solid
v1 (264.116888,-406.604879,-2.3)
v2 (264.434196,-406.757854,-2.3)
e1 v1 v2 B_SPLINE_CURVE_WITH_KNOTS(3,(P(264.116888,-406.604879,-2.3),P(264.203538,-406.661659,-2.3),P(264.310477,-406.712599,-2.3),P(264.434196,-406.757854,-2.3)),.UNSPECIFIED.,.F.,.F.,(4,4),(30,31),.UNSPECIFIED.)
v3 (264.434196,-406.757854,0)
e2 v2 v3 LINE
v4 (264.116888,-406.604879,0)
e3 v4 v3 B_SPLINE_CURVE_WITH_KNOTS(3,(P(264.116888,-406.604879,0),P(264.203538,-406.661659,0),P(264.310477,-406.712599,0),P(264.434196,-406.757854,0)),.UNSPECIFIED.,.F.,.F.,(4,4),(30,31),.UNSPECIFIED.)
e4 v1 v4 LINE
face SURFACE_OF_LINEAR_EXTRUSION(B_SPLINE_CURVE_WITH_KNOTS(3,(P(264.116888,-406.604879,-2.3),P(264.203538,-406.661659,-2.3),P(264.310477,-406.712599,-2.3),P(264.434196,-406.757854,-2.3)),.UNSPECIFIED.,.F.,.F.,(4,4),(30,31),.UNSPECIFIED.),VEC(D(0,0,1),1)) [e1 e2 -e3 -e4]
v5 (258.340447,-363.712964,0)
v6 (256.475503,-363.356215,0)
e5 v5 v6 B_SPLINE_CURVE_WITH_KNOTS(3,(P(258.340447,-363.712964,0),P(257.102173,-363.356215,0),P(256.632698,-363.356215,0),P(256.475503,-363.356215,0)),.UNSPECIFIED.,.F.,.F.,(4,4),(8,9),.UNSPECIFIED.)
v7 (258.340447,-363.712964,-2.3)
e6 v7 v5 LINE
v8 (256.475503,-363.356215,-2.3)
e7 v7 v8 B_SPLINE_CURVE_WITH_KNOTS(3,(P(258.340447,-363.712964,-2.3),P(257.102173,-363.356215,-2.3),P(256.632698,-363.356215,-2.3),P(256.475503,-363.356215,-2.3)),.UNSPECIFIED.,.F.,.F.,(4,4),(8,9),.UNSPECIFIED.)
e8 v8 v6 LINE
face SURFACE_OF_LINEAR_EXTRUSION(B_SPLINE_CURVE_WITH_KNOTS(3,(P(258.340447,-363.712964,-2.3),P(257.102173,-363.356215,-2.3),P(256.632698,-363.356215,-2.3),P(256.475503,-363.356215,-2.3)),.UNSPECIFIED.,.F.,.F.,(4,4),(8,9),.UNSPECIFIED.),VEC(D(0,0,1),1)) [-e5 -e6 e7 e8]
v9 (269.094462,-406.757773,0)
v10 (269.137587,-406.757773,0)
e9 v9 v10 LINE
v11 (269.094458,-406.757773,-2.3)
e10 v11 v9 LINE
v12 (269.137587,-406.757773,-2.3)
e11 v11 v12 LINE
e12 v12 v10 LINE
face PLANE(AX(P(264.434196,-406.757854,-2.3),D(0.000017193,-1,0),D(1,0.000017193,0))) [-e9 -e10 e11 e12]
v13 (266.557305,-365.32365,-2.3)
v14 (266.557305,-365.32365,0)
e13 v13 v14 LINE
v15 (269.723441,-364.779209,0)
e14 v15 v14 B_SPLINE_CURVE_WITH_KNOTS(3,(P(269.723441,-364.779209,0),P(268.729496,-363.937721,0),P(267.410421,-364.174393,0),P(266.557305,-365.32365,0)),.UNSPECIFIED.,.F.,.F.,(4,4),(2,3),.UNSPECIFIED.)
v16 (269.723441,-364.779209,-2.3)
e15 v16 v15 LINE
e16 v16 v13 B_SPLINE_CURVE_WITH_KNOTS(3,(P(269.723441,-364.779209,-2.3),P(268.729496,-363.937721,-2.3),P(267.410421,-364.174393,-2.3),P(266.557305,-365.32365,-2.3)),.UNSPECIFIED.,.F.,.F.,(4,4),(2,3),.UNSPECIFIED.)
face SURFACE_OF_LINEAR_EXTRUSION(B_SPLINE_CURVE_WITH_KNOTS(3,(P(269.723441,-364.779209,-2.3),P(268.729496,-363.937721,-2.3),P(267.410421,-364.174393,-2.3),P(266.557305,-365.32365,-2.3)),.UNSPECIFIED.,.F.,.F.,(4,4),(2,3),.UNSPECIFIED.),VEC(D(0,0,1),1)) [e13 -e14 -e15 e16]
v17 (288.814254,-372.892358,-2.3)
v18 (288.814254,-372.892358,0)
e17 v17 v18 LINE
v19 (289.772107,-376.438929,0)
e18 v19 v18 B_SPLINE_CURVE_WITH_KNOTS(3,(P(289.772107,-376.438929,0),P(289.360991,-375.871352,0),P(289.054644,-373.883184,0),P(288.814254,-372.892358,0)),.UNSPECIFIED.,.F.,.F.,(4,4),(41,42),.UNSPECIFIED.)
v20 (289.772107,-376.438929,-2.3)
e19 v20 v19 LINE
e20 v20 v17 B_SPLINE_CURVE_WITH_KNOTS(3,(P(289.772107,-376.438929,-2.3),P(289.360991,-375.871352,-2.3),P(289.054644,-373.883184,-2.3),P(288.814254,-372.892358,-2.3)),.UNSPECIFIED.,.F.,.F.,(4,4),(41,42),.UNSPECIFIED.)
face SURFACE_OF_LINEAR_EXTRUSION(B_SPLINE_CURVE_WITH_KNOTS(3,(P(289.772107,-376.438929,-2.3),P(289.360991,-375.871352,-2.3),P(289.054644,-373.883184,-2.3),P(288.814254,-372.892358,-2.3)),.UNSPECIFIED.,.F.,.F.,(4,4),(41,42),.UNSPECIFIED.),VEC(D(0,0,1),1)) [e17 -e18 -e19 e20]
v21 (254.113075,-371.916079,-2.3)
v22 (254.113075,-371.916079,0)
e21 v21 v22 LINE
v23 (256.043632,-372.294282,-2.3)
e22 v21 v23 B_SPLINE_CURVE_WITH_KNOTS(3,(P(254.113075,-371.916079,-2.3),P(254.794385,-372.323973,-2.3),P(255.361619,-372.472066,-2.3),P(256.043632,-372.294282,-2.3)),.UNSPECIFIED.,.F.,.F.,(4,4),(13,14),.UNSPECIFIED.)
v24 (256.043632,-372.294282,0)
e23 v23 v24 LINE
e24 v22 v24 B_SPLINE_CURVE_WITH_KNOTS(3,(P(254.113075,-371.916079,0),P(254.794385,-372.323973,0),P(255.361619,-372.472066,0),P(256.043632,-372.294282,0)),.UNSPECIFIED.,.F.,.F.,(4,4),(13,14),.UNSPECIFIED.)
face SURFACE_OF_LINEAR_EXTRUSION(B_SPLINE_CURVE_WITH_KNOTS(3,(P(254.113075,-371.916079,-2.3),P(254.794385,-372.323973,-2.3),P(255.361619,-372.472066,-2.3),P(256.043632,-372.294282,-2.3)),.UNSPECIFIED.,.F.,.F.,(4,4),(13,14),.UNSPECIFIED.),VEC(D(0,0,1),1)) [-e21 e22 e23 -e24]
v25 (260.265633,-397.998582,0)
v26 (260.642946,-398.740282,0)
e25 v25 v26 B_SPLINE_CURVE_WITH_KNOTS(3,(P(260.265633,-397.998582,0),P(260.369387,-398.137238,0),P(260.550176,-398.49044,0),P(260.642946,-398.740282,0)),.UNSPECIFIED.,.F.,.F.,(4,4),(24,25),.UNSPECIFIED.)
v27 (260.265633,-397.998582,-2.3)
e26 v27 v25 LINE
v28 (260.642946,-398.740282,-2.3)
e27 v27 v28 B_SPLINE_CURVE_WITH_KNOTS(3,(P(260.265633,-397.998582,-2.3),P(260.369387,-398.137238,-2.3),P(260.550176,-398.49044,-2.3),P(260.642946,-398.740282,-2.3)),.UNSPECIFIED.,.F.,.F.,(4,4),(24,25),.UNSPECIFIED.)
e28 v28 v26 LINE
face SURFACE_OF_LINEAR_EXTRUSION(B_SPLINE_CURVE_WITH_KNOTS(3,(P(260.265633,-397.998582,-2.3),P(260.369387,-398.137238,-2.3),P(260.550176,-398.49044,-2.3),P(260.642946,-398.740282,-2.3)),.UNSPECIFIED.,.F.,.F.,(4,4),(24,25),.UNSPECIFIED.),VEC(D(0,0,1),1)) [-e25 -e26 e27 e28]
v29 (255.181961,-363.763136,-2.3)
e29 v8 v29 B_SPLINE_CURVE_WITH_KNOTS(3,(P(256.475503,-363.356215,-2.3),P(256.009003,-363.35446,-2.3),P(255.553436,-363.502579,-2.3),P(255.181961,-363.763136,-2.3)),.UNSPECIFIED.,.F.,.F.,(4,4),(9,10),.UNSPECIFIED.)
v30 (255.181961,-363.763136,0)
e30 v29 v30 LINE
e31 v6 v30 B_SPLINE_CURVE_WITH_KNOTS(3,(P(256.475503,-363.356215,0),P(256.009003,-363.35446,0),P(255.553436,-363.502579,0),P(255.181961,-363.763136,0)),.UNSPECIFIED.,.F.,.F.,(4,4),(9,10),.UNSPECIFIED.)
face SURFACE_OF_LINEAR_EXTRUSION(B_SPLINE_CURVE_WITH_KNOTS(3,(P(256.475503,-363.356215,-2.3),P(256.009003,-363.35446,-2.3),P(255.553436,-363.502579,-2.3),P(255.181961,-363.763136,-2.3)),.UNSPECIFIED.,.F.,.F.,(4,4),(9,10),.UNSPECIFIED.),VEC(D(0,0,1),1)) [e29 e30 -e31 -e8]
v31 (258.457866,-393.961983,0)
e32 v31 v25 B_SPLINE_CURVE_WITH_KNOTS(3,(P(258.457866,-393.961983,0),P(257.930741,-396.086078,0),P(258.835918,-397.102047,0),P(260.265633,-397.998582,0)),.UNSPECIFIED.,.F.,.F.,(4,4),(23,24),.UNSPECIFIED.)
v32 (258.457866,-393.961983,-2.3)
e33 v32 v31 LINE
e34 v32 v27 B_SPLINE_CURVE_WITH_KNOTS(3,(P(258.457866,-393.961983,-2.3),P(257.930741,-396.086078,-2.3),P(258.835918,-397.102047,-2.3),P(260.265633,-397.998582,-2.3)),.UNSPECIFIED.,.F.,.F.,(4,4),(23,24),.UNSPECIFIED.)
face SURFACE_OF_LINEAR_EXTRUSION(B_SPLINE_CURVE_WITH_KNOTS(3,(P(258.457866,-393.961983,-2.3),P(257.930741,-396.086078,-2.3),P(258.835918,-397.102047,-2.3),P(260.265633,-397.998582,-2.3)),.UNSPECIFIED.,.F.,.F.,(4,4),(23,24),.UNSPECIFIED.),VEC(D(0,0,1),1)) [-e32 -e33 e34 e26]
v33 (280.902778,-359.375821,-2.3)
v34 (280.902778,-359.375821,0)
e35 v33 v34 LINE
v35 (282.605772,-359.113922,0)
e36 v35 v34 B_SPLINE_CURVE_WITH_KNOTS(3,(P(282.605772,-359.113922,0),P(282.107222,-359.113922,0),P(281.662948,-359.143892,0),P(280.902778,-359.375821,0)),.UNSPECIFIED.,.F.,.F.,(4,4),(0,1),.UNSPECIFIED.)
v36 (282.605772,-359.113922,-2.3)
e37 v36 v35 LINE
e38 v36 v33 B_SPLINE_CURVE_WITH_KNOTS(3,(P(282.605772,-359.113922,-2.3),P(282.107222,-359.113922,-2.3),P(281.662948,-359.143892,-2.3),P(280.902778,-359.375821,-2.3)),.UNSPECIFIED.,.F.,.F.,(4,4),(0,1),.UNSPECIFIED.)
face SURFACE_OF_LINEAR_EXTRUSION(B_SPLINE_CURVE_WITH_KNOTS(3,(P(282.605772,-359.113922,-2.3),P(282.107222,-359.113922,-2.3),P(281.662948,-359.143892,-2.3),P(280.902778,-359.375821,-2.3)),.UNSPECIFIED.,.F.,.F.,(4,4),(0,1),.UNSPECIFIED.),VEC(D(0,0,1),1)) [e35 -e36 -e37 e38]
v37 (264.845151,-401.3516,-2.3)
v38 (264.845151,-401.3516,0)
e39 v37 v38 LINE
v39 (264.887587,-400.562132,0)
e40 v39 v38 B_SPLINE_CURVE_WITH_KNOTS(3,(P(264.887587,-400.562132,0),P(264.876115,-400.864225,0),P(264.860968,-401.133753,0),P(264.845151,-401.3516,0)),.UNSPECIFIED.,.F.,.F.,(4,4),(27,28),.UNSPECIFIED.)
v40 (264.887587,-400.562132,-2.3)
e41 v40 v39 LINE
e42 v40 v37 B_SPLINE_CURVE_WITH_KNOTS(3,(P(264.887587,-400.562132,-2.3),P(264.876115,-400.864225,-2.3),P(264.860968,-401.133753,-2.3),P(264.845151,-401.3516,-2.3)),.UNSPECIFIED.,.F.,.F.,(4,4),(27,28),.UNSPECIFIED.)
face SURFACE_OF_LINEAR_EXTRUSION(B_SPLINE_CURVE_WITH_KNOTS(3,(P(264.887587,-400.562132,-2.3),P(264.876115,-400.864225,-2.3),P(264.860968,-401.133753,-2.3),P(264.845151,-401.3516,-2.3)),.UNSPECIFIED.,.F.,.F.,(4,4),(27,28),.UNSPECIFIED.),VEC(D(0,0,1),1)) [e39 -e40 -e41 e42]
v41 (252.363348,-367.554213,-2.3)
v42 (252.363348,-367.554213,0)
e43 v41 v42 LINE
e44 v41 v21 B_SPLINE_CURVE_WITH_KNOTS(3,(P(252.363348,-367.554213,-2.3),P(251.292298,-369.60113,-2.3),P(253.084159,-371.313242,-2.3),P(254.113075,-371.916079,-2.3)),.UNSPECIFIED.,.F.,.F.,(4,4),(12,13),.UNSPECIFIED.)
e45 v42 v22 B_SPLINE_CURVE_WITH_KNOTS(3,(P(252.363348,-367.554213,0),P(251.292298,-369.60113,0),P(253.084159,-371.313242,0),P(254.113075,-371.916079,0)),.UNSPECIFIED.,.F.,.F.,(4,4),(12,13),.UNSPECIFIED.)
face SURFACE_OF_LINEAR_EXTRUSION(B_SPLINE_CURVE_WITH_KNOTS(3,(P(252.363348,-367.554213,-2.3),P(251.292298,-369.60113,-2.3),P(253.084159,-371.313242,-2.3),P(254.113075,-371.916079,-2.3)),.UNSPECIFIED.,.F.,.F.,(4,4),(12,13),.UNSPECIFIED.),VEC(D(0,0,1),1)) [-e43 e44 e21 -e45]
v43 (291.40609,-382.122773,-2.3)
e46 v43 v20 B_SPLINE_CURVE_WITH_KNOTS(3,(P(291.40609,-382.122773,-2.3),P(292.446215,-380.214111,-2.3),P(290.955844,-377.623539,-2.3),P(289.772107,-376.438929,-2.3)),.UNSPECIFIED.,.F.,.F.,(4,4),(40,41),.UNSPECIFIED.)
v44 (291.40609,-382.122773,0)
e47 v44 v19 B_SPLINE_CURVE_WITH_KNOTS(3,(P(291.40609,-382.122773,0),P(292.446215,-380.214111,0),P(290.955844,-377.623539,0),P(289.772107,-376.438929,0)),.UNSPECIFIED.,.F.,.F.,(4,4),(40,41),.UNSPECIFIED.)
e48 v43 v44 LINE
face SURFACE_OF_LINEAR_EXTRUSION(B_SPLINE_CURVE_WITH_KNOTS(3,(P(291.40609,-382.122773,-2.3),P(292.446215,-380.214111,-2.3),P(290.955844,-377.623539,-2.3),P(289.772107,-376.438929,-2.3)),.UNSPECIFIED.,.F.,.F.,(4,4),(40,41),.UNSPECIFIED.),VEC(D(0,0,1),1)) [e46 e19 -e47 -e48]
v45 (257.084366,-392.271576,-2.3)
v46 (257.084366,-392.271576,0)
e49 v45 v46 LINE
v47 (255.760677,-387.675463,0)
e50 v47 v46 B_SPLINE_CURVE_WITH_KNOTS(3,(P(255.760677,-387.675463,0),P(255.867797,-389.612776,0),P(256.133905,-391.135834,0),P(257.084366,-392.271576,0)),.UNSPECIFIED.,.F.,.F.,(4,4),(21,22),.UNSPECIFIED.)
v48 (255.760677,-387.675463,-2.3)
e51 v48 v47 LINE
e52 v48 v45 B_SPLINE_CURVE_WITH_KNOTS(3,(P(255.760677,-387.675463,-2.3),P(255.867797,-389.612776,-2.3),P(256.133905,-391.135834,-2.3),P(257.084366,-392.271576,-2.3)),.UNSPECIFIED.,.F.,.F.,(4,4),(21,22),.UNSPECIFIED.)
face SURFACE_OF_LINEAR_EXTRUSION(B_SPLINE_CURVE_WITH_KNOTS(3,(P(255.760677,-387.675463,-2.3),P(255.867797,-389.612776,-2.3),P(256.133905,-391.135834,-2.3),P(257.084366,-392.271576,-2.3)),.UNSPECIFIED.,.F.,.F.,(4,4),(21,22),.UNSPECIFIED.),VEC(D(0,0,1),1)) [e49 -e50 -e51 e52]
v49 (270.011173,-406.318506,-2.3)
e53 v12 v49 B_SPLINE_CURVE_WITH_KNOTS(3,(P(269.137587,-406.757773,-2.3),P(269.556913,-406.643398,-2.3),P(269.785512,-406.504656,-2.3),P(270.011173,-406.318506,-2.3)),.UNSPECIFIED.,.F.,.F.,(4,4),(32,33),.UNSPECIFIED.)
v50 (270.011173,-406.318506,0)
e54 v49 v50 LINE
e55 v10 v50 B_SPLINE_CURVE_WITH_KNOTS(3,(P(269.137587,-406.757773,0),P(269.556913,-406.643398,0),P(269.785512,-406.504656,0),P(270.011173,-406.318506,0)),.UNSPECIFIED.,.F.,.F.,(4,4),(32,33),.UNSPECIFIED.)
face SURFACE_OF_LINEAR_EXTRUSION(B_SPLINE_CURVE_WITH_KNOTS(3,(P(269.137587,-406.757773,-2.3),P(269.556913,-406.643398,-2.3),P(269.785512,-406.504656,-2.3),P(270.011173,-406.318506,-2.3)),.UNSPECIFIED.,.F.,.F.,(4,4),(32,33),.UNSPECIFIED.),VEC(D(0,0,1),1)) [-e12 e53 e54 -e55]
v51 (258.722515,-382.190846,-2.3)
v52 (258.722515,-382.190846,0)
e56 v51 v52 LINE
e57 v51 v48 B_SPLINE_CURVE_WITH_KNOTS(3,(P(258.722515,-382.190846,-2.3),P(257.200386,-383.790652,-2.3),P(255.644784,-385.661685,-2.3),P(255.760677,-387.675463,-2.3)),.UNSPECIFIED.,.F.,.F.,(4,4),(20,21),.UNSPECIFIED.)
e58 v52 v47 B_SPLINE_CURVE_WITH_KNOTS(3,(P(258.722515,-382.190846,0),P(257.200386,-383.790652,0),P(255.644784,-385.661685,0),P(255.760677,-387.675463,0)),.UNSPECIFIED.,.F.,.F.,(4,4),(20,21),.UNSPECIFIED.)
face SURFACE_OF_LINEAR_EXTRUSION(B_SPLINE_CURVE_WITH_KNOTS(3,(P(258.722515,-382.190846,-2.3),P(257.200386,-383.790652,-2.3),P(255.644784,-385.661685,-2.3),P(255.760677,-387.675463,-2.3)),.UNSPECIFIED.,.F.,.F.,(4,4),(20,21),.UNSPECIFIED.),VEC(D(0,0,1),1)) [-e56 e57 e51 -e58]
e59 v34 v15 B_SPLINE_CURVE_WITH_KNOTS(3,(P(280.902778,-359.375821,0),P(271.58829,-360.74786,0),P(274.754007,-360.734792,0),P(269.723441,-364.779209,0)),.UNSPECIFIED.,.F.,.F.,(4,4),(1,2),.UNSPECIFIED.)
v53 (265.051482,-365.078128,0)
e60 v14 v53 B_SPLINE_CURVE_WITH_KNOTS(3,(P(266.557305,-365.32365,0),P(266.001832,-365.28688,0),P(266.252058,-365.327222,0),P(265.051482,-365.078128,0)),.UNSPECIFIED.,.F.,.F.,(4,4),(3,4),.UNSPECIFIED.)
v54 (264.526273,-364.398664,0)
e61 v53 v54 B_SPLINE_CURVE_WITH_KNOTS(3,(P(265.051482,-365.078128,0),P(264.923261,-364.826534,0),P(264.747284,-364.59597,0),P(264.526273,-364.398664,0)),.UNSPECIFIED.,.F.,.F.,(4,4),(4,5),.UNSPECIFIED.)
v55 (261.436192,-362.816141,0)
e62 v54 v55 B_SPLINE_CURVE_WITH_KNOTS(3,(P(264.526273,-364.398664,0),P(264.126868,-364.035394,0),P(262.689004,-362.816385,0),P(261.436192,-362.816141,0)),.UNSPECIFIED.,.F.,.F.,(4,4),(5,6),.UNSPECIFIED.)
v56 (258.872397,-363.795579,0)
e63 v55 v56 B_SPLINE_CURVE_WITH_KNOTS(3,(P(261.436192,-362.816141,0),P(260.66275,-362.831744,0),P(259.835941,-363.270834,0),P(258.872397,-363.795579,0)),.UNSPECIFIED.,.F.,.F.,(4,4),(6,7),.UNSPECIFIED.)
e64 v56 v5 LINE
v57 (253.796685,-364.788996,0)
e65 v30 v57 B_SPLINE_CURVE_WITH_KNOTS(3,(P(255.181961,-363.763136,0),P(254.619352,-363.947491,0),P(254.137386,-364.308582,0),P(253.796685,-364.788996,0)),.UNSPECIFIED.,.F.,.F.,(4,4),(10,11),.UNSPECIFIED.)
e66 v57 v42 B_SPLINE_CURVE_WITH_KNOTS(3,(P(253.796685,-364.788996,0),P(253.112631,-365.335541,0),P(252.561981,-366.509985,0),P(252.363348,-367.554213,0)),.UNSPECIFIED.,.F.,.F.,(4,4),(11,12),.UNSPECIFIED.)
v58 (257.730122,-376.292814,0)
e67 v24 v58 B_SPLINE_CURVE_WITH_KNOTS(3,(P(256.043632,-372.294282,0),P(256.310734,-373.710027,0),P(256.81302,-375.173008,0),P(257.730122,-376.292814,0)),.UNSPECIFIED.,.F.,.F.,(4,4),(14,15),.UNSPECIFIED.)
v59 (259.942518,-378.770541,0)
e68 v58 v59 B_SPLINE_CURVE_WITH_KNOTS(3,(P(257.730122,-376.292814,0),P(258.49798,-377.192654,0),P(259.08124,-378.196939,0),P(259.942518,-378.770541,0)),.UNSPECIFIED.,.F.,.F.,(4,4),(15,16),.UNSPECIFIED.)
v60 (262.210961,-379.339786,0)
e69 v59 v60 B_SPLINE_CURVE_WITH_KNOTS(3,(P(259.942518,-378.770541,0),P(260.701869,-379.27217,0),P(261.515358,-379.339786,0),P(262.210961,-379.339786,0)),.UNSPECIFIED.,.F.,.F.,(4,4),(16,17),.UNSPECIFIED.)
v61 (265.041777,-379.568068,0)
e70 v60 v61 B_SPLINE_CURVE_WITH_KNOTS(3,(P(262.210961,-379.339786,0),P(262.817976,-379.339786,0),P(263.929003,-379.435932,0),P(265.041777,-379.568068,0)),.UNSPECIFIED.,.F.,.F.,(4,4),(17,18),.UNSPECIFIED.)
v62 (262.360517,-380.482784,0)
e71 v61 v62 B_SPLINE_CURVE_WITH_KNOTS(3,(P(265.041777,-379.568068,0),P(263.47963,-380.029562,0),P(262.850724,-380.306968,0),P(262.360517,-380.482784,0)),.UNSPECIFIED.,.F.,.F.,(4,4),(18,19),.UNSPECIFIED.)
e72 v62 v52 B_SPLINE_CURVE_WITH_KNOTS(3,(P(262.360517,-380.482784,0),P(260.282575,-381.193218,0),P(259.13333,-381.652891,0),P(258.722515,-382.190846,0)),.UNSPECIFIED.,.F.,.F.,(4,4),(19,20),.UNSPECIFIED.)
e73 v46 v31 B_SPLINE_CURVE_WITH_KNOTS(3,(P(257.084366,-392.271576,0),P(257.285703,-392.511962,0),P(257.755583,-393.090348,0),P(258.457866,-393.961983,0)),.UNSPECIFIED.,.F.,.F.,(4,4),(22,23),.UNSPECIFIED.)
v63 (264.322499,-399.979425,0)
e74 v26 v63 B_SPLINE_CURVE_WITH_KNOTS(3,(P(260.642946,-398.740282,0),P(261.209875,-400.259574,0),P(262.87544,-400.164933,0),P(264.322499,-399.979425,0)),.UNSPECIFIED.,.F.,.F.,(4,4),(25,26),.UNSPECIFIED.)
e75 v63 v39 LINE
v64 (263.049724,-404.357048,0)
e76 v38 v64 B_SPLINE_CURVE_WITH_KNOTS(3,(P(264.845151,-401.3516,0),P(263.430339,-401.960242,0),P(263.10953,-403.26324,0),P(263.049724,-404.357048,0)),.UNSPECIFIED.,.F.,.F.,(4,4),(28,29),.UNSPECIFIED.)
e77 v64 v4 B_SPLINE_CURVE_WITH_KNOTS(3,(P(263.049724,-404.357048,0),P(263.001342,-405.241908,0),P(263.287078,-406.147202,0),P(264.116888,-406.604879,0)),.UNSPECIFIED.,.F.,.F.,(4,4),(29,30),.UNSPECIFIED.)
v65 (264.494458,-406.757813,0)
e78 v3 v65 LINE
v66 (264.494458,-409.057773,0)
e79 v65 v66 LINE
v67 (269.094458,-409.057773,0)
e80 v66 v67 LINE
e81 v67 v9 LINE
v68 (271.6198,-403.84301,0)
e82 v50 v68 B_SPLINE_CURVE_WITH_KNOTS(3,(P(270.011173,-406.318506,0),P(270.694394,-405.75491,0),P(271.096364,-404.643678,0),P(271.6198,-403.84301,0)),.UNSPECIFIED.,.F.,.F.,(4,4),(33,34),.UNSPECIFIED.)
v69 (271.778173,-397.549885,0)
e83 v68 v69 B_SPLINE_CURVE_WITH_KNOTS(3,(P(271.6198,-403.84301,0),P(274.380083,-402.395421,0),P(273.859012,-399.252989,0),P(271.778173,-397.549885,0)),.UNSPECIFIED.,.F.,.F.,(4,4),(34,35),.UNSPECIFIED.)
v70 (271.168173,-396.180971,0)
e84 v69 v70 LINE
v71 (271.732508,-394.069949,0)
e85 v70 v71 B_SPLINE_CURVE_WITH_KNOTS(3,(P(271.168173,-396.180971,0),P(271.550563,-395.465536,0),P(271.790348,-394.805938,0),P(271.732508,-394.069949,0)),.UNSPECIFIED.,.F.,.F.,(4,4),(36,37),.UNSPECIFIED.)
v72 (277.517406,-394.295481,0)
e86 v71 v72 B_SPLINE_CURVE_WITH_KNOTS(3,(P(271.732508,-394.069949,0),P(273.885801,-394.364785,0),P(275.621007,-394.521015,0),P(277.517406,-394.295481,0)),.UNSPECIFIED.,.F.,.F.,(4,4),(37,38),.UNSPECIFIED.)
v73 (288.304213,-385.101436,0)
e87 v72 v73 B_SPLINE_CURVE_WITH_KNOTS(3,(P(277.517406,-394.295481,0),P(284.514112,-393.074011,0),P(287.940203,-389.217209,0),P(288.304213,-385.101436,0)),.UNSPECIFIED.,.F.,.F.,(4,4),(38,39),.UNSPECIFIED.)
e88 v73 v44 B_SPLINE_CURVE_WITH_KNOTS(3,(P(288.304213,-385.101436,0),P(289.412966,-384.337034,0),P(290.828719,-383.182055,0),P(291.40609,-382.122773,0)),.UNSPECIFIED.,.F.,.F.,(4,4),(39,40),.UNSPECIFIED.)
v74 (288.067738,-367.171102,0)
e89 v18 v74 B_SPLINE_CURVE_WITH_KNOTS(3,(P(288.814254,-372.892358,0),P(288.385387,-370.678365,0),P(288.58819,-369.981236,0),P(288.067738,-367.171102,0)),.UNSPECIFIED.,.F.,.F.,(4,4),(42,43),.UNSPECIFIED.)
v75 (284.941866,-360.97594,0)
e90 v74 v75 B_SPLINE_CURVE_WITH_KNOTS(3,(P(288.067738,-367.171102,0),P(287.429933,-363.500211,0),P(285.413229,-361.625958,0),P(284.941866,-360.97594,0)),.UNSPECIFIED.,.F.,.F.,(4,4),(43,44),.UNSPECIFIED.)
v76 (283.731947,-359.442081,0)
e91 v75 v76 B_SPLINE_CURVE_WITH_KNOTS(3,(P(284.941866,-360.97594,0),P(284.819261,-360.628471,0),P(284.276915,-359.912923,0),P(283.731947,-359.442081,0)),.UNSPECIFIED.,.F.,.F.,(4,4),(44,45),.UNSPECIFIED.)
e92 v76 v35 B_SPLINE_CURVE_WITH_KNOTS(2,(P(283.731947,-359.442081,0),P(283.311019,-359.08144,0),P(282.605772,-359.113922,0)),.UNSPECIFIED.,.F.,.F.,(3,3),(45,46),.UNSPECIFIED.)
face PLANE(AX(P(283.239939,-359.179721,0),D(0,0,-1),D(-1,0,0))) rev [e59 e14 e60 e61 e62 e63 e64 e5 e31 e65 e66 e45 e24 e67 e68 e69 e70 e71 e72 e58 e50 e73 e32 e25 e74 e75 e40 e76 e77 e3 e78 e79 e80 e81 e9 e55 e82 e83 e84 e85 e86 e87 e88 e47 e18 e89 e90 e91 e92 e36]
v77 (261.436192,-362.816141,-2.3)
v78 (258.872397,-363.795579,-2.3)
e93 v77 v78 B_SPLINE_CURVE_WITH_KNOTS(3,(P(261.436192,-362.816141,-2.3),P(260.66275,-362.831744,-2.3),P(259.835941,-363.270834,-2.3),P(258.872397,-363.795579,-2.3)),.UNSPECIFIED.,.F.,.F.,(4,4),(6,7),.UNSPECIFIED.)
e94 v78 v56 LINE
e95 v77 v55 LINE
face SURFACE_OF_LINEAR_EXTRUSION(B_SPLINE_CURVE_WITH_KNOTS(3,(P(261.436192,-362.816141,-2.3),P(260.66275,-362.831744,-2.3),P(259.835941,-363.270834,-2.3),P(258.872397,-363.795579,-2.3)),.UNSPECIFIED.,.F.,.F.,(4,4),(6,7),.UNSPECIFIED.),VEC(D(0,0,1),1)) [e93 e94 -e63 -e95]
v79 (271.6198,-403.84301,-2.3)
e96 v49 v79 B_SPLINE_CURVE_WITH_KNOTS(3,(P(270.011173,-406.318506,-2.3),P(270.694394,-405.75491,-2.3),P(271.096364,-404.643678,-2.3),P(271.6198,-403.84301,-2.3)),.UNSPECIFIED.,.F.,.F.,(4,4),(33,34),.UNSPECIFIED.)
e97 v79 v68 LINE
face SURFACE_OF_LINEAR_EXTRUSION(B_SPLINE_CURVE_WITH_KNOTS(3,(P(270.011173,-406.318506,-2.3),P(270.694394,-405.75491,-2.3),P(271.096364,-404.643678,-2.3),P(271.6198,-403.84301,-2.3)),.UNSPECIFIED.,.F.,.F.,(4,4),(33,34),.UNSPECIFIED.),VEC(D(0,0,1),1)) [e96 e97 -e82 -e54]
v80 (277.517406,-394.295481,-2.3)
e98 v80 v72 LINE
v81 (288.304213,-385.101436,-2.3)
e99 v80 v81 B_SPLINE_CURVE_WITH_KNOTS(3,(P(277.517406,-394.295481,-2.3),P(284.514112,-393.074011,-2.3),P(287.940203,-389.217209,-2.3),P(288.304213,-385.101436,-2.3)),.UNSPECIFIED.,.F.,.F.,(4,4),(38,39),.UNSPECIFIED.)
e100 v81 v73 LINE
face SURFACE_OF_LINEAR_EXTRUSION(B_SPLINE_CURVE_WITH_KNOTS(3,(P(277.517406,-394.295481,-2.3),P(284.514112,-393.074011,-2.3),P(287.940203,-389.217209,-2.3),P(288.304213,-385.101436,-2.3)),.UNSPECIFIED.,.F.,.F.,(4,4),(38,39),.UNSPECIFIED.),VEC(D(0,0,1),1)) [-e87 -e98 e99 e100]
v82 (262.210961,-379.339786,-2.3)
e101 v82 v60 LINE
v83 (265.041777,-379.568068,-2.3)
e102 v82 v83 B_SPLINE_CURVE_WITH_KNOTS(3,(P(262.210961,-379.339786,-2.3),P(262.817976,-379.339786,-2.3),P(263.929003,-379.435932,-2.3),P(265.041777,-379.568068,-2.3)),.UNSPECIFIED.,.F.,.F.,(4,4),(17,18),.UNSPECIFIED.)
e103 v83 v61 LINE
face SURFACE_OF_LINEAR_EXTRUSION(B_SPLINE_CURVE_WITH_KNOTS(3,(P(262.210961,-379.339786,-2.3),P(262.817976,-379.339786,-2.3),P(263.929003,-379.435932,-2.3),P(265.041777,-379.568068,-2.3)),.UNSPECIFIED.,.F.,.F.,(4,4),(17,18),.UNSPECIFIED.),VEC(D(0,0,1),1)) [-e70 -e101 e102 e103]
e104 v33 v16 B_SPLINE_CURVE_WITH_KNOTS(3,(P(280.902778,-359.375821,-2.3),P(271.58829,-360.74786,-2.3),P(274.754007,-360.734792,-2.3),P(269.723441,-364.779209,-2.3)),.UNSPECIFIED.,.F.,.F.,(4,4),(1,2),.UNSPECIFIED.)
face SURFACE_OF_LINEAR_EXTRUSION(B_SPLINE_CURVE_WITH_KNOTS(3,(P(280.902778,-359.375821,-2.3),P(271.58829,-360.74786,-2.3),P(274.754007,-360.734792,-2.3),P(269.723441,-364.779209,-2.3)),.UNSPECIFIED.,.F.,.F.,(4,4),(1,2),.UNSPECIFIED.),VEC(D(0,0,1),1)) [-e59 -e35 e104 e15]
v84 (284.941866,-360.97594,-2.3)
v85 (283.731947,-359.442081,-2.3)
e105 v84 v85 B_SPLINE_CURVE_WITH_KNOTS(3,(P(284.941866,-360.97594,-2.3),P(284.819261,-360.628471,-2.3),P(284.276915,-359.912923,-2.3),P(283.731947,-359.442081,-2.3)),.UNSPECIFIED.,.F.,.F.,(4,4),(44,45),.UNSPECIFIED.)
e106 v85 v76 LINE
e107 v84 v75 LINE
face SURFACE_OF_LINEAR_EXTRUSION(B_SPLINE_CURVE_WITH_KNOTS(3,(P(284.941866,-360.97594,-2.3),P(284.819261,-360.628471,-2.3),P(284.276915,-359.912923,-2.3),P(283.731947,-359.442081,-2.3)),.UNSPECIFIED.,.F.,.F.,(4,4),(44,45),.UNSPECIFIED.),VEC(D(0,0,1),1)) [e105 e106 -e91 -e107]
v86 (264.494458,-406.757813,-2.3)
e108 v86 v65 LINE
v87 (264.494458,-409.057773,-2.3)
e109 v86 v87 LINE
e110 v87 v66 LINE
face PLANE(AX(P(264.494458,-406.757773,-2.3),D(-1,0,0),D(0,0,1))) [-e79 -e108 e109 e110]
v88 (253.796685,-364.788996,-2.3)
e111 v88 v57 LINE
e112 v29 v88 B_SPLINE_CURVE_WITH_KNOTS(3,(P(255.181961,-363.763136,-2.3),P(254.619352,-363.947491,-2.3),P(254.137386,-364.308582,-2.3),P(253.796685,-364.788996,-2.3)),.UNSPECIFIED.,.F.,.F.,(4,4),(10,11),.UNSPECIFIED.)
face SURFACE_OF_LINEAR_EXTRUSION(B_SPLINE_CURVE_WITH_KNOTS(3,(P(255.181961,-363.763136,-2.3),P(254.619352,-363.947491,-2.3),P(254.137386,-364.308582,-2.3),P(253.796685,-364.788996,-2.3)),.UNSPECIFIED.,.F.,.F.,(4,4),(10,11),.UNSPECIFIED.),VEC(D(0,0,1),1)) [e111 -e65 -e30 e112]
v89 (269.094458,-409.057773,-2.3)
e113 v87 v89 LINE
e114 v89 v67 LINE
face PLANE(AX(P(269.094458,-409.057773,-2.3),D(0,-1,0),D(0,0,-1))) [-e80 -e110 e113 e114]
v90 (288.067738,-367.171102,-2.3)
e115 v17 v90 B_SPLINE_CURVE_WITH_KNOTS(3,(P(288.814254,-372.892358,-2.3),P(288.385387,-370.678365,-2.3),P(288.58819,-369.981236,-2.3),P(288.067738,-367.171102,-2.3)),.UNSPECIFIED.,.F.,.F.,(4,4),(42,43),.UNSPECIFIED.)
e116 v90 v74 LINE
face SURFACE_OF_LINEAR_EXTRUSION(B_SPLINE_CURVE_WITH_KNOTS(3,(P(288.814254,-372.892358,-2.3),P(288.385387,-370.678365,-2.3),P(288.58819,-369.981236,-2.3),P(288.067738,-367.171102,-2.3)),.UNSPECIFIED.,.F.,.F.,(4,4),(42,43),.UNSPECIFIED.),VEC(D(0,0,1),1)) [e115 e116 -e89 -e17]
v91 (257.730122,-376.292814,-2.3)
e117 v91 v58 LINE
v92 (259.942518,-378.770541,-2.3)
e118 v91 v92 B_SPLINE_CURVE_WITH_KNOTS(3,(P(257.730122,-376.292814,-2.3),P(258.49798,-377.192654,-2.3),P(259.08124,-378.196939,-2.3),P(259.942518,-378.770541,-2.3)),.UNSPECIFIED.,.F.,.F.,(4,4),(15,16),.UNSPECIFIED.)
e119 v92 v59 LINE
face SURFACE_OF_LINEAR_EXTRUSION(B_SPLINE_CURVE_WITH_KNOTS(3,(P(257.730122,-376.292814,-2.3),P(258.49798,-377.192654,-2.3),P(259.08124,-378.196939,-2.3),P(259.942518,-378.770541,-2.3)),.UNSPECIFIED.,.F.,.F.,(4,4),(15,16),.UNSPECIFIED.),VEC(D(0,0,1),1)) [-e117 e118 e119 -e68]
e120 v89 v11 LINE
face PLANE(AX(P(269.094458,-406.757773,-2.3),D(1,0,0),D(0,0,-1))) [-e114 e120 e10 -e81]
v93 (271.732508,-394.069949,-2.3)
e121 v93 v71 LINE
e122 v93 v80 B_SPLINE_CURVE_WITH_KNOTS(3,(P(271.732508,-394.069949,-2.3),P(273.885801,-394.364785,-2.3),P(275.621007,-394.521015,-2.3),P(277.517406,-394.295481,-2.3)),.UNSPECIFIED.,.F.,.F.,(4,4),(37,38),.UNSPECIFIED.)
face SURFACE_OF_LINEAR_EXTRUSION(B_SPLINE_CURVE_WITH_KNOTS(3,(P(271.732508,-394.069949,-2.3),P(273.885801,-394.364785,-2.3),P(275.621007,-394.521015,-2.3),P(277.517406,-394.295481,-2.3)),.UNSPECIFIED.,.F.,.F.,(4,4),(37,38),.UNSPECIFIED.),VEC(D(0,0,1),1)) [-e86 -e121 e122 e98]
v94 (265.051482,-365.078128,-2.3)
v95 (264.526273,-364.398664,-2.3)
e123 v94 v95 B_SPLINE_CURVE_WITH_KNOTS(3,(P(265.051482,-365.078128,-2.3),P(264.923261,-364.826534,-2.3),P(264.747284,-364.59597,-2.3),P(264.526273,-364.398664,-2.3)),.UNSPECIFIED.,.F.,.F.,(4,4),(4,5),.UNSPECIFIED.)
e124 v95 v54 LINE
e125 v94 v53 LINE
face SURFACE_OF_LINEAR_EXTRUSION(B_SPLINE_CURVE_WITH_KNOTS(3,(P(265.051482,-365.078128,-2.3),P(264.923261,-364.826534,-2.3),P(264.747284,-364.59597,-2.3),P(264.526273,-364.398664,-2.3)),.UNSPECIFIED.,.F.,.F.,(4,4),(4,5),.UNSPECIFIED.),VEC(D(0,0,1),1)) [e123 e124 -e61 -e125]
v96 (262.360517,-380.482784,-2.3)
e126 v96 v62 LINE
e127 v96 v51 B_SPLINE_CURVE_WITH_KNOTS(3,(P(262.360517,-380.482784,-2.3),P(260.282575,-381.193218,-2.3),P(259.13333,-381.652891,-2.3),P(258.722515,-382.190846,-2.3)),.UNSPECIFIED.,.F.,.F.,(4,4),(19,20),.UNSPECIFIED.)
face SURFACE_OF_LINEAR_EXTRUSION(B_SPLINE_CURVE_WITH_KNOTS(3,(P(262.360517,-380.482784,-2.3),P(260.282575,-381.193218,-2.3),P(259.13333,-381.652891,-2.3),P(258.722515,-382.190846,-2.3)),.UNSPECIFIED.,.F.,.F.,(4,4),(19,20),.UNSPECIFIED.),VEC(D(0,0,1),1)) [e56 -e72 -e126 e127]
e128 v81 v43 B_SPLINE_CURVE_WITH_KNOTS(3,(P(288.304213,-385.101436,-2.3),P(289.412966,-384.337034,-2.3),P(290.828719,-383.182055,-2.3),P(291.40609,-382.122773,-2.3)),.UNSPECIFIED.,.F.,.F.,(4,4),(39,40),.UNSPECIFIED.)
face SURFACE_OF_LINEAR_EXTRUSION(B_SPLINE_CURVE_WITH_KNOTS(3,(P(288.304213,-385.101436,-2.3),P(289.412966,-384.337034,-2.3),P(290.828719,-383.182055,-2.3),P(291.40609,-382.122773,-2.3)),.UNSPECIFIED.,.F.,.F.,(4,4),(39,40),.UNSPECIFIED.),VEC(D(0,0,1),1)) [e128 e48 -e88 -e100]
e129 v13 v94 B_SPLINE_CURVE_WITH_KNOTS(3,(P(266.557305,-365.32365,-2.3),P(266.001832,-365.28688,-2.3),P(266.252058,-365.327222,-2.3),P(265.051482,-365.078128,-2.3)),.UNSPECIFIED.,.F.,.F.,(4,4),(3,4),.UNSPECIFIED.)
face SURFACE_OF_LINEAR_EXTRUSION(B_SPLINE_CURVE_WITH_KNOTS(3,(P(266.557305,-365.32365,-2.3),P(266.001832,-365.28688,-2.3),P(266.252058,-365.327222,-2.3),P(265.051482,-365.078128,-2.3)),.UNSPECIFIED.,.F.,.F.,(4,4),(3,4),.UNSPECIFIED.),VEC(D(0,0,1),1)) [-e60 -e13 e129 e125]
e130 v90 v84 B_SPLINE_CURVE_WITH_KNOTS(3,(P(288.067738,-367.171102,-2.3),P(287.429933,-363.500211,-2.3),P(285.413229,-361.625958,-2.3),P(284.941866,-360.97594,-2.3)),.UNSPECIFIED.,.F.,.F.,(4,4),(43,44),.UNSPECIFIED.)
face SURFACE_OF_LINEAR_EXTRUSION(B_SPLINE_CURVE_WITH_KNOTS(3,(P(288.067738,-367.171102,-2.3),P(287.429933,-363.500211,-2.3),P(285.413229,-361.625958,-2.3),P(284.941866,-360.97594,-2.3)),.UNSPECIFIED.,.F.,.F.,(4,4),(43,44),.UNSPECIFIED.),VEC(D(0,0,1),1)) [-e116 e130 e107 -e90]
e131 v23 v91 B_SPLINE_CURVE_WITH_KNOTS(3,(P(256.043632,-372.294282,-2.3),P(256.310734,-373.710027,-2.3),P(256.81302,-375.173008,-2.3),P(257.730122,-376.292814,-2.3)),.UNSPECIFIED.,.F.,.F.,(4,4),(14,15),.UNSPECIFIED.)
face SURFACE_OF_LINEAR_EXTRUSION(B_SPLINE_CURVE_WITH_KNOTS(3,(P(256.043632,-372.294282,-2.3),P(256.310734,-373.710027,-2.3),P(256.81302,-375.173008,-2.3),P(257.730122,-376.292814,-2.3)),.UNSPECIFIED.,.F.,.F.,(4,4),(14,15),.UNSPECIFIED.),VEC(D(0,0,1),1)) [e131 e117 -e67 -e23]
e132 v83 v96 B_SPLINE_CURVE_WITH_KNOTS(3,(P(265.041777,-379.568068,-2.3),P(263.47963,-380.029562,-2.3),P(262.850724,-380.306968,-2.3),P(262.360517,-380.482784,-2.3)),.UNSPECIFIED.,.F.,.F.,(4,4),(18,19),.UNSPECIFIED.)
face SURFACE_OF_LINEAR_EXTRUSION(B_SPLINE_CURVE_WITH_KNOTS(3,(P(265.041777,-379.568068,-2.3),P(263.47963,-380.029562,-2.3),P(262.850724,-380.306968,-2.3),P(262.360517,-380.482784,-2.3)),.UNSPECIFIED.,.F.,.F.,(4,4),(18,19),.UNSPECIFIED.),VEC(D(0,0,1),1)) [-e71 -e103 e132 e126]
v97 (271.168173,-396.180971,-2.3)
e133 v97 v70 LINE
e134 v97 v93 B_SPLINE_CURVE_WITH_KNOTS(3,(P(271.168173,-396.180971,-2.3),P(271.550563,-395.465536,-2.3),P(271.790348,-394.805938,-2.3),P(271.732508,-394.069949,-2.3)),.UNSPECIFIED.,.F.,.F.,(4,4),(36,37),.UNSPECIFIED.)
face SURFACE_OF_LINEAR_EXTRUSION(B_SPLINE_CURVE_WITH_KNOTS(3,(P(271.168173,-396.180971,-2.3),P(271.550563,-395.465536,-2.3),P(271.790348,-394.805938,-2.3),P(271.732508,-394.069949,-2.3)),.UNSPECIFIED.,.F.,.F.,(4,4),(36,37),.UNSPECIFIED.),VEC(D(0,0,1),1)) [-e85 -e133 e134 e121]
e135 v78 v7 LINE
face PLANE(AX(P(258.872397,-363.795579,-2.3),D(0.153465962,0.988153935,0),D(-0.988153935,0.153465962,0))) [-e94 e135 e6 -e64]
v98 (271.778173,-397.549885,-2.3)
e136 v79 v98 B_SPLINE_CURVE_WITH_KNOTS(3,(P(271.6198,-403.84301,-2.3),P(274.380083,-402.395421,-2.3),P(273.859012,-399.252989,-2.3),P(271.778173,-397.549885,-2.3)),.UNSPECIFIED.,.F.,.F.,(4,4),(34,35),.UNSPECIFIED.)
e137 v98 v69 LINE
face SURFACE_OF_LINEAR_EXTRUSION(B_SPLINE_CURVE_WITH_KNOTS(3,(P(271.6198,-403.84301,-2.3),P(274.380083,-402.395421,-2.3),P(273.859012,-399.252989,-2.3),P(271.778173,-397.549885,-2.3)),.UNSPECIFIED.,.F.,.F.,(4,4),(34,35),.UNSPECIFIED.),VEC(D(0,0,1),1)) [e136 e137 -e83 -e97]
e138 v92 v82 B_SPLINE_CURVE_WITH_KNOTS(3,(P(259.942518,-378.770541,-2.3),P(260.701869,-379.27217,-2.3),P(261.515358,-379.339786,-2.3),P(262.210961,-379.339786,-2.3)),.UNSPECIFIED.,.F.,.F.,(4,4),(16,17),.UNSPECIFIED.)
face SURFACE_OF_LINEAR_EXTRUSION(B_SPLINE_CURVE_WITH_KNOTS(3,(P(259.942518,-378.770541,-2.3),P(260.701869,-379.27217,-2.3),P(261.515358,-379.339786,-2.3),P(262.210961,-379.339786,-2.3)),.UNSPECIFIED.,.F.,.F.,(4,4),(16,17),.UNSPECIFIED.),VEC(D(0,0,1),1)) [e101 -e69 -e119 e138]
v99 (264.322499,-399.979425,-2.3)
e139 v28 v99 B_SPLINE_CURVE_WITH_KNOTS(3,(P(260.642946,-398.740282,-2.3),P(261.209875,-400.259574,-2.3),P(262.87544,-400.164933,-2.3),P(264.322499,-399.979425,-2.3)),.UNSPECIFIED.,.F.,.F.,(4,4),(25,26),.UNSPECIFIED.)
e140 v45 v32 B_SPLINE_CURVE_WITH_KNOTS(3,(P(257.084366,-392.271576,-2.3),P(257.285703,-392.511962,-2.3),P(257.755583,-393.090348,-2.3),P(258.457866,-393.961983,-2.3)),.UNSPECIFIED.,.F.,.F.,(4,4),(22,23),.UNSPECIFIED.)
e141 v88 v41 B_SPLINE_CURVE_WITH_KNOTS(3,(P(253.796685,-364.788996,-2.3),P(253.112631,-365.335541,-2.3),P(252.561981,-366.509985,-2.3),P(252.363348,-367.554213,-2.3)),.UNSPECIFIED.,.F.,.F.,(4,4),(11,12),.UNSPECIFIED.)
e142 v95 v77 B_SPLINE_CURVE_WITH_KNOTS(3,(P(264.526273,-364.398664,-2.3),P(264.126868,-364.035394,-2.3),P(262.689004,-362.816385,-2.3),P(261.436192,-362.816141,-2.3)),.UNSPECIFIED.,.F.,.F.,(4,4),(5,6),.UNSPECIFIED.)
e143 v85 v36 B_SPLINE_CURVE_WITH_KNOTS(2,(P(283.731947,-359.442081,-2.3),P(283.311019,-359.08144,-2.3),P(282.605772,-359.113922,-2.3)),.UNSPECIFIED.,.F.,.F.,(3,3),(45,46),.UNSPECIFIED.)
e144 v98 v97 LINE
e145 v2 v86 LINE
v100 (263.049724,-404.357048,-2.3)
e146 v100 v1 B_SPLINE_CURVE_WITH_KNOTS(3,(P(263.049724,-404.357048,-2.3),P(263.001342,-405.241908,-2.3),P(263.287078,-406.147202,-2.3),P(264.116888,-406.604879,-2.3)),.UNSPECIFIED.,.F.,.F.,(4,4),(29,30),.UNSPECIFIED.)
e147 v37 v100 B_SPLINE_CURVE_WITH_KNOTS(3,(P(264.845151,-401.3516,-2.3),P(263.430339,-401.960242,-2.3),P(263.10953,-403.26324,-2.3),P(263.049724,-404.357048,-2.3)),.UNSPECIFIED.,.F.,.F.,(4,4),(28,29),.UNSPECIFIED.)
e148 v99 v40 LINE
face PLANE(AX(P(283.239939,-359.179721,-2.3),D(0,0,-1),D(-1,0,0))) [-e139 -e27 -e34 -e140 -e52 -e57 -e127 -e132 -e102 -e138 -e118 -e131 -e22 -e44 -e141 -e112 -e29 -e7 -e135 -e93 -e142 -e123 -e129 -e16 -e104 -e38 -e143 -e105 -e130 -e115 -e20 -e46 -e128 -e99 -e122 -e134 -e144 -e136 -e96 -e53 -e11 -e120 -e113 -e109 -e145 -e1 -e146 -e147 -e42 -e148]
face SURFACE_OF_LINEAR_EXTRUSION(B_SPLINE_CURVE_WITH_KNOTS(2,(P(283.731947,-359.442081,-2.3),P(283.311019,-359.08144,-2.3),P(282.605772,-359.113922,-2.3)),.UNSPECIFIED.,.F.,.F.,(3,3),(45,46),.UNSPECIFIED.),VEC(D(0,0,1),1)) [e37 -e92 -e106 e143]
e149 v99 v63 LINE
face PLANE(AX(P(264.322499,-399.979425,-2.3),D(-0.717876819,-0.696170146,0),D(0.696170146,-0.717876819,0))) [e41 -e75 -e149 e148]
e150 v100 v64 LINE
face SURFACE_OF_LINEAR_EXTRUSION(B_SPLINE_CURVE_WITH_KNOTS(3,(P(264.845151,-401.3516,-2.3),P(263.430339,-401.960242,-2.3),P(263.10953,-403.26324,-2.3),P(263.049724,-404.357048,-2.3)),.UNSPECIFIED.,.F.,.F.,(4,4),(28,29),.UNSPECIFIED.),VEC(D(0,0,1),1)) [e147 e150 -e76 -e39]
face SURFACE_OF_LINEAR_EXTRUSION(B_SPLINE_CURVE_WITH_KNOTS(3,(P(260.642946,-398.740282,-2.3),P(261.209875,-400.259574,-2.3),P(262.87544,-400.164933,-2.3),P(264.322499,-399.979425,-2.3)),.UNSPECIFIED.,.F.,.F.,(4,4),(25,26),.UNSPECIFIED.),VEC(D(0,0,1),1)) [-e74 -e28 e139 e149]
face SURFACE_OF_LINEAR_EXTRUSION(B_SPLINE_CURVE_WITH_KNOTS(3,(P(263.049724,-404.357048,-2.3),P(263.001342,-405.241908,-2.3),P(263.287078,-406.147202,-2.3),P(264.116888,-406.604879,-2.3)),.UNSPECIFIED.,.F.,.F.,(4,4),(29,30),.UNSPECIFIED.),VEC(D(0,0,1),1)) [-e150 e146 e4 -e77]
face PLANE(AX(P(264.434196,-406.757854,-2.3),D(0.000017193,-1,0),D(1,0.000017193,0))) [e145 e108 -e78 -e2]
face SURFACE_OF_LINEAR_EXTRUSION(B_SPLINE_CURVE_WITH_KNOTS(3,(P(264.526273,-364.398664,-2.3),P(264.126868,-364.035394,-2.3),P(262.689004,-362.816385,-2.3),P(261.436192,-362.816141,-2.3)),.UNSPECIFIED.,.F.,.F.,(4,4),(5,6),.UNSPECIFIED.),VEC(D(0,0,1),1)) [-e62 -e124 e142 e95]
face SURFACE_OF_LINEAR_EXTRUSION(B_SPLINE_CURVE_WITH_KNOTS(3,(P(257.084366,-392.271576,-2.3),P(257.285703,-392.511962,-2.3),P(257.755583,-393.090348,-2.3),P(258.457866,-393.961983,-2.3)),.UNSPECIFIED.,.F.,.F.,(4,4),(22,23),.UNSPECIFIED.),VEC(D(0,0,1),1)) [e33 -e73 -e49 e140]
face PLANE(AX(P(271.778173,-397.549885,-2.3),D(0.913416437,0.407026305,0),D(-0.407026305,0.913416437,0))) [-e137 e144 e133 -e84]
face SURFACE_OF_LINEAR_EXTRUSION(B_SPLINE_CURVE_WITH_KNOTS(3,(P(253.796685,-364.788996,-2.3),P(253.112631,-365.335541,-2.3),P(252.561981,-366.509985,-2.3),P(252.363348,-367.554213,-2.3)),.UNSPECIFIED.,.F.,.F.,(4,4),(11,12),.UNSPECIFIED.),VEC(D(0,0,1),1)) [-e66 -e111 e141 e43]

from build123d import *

# Parameters (mm, degrees)
BASE_FLANGE1_DEPTH = 2.3
SKETCH9_W          = 4.6
SKETCH9_H          = 2.3
TAB2_DEPTH         = 2.3


# Sheet-metal steps are written as plain solids
with BuildPart() as part:
    # Model → Base-Flange1 (new body)
    with BuildSketch(Plane.XY):
        with BuildLine():
            Line((258.872397146, -363.795578641), (258.340446595, -363.712963676))
            add(Edge.make_bspline(
                [(258.340446595, -363.712963676), (257.102172757, -363.356215382), (256.632698326, -363.356215382), (256.475502968, -363.356215382)],
                knots=[8, 8, 8, 8, 9, 9, 9, 9], degree=3))
            add(Edge.make_bspline(
                [(256.475502968, -363.356215382), (256.009003058, -363.35446041), (255.553436381, -363.502578837), (255.181961013, -363.763135862)],
                knots=[9, 9, 9, 9, 10, 10, 10, 10], degree=3))
            add(Edge.make_bspline(
                [(255.181961013, -363.763135862), (254.61935208, -363.947490852), (254.137386149, -364.308582381), (253.796684542, -364.788996088)],
                knots=[10, 10, 10, 10, 11, 11, 11, 11], degree=3))
            add(Edge.make_bspline(
                [(253.796684542, -364.788996088), (253.112631486, -365.335540723), (252.561980801, -366.509985051), (252.363347956, -367.554213129)],
                knots=[11, 11, 11, 11, 12, 12, 12, 12], degree=3))
            add(Edge.make_bspline(
                [(252.363347956, -367.554213129), (251.292298247, -369.601129513), (253.084159031, -371.313241657), (254.113075303, -371.91607939)],
                knots=[12, 12, 12, 12, 13, 13, 13, 13], degree=3))
            add(Edge.make_bspline(
                [(254.113075303, -371.91607939), (254.794385244, -372.323972969), (255.361618749, -372.472065776), (256.043631973, -372.294282429)],
                knots=[13, 13, 13, 13, 14, 14, 14, 14], degree=3))
            add(Edge.make_bspline(
                [(256.043631973, -372.294282429), (256.310734133, -373.710026601), (256.813020202, -375.173008438), (257.730121712, -376.292814147)],
                knots=[14, 14, 14, 14, 15, 15, 15, 15], degree=3))
            add(Edge.make_bspline(
                [(257.730121712, -376.292814147), (258.497979568, -377.192653975), (259.081240118, -378.196938842), (259.942517788, -378.7705408)],
                knots=[15, 15, 15, 15, 16, 16, 16, 16], degree=3))
            add(Edge.make_bspline(
                [(259.942517788, -378.7705408), (260.701869281, -379.27216983), (261.5153583, -379.339786124), (262.210960953, -379.339786124)],
                knots=[16, 16, 16, 16, 17, 17, 17, 17], degree=3))
            add(Edge.make_bspline(
                [(262.210960953, -379.339786124), (262.817976246, -379.339786124), (263.929003467, -379.435932499), (265.041776853, -379.568067535)],
                knots=[17, 17, 17, 17, 18, 18, 18, 18], degree=3))
            add(Edge.make_bspline(
                [(265.041776853, -379.568067535), (263.479630225, -380.029561986), (262.850723669, -380.306968395), (262.360517171, -380.482783945)],
                knots=[18, 18, 18, 18, 19, 19, 19, 19], degree=3))
            add(Edge.make_bspline(
                [(262.360517171, -380.482783945), (260.282574516, -381.193217879), (259.133330439, -381.652890954), (258.722514931, -382.190846024)],
                knots=[19, 19, 19, 19, 20, 20, 20, 20], degree=3))
            add(Edge.make_bspline(
                [(258.722514931, -382.190846024), (257.20038636, -383.790652427), (255.644784401, -385.661685175), (255.760676668, -387.675462928)],
                knots=[20, 20, 20, 20, 21, 21, 21, 21], degree=3))
            add(Edge.make_bspline(
                [(255.760676668, -387.675462928), (255.867797332, -389.612775698), (256.133904584, -391.135833734), (257.084365946, -392.271575533)],
                knots=[21, 21, 21, 21, 22, 22, 22, 22], degree=3))
            add(Edge.make_bspline(
                [(257.084365946, -392.271575533), (257.285702702, -392.51196185), (257.755583218, -393.090348122), (258.457865963, -393.961982878)],
                knots=[22, 22, 22, 22, 23, 23, 23, 23], degree=3))
            add(Edge.make_bspline(
                [(258.457865963, -393.961982878), (257.930741372, -396.086078132), (258.835917618, -397.102047436), (260.265632875, -397.998581877)],
                knots=[23, 23, 23, 23, 24, 24, 24, 24], degree=3))
            add(Edge.make_bspline(
                [(260.265632875, -397.998581877), (260.369387496, -398.137238074), (260.55017637, -398.490440486), (260.642946402, -398.740282488)],
                knots=[24, 24, 24, 24, 25, 25, 25, 25], degree=3))
            add(Edge.make_bspline(
                [(260.642946402, -398.740282488), (261.209875025, -400.259574159), (262.875440397, -400.164932984), (264.322499466, -399.979425454)],
                knots=[25, 25, 25, 25, 26, 26, 26, 26], degree=3))
            Line((264.322499466, -399.979425454), (264.887586522, -400.562131996))
            add(Edge.make_bspline(
                [(264.887586522, -400.562131996), (264.876114631, -400.864224805), (264.860967675, -401.133752563), (264.845150679, -401.351600116)],
                knots=[27, 27, 27, 27, 28, 28, 28, 28], degree=3))
            add(Edge.make_bspline(
                [(264.845150679, -401.351600116), (263.430338911, -401.96024249), (263.109530454, -403.263240278), (263.049723659, -404.357047591)],
                knots=[28, 28, 28, 28, 29, 29, 29, 29], degree=3))
            add(Edge.make_bspline(
                [(263.049723659, -404.357047591), (263.001341567, -405.241908361), (263.287078244, -406.147201915), (264.116888391, -406.604878935)],
                knots=[29, 29, 29, 29, 30, 30, 30, 30], degree=3))
            add(Edge.make_bspline(
                [(264.116888391, -406.604878935), (264.203538156, -406.661659444), (264.310476644, -406.712599047), (264.434195613, -406.757853518)],
                knots=[30, 30, 30, 30, 31, 31, 31, 31], degree=3))
            Line((264.434195613, -406.757853518), (269.137586815, -406.757772651))
            add(Edge.make_bspline(
                [(269.137586815, -406.757772651), (269.556913154, -406.643398105), (269.785512137, -406.504655605), (270.011173306, -406.318505513)],
                knots=[32, 32, 32, 32, 33, 33, 33, 33], degree=3))
            add(Edge.make_bspline(
                [(270.011173306, -406.318505513), (270.694394242, -405.754909925), (271.096364494, -404.643678371), (271.619799516, -403.843009885)],
                knots=[33, 33, 33, 33, 34, 34, 34, 34], degree=3))
            add(Edge.make_bspline(
                [(271.619799516, -403.843009885), (274.380082617, -402.39542121), (273.859011699, -399.252989356), (271.778172518, -397.549885205)],
                knots=[34, 34, 34, 34, 35, 35, 35, 35], degree=3))
            Line((271.778172518, -397.549885205), (271.168172503, -396.180971124))
            add(Edge.make_bspline(
                [(271.168172503, -396.180971124), (271.55056252, -395.46553604), (271.790347913, -394.805938132), (271.732508302, -394.069948859)],
                knots=[36, 36, 36, 36, 37, 37, 37, 37], degree=3))
            add(Edge.make_bspline(
                [(271.732508302, -394.069948859), (273.88580142, -394.364785311), (275.621007018, -394.52101491), (277.517405963, -394.295481162)],
                knots=[37, 37, 37, 37, 38, 38, 38, 38], degree=3))
            add(Edge.make_bspline(
                [(277.517405963, -394.295481162), (284.51411226, -393.074010998), (287.940203407, -389.217208572), (288.3042126, -385.101436138)],
                knots=[38, 38, 38, 38, 39, 39, 39, 39], degree=3))
            add(Edge.make_bspline(
                [(288.3042126, -385.101436138), (289.412965748, -384.337033733), (290.82871887, -383.182054508), (291.406089985, -382.122773329)],
                knots=[39, 39, 39, 39, 40, 40, 40, 40], degree=3))
            add(Edge.make_bspline(
                [(291.406089985, -382.122773329), (292.446214832, -380.214110858), (290.955843661, -377.623538676), (289.772106988, -376.438928923)],
                knots=[40, 40, 40, 40, 41, 41, 41, 41], degree=3))
            add(Edge.make_bspline(
                [(289.772106988, -376.438928923), (289.360991342, -375.871352456), (289.054644482, -373.883183799), (288.814254345, -372.892357973)],
                knots=[41, 41, 41, 41, 42, 42, 42, 42], degree=3))
            add(Edge.make_bspline(
                [(288.814254345, -372.892357973), (288.385386538, -370.678365432), (288.588190274, -369.981235925), (288.067737839, -367.171102485)],
                knots=[42, 42, 42, 42, 43, 43, 43, 43], degree=3))
            add(Edge.make_bspline(
                [(288.067737839, -367.171102485), (287.429932713, -363.50021078), (285.413229012, -361.625957626), (284.941866287, -360.97594047)],
                knots=[43, 43, 43, 43, 44, 44, 44, 44], degree=3))
            add(Edge.make_bspline(
                [(284.941866287, -360.97594047), (284.819260833, -360.628471203), (284.276915253, -359.912923043), (283.73194671, -359.442080556)],
                knots=[44, 44, 44, 44, 45, 45, 45, 45], degree=3))
            add(Edge.make_bspline(
                [(283.73194671, -359.442080556), (283.311019249, -359.081440044), (282.605772307, -359.113922017)],
                knots=[45, 45, 45, 46, 46, 46], degree=2))
            add(Edge.make_bspline(
                [(282.605772307, -359.113922017), (282.107222216, -359.113922017), (281.662947649, -359.143891723), (280.902777541, -359.375820909)],
                knots=[0, 0, 0, 0, 1, 1, 1, 1], degree=3))
            add(Edge.make_bspline(
                [(280.902777541, -359.375820909), (271.588289586, -360.747860342), (274.754006955, -360.734792281), (269.723440936, -364.779208584)],
                knots=[1, 1, 1, 1, 2, 2, 2, 2], degree=3))
            add(Edge.make_bspline(
                [(269.723440936, -364.779208584), (268.729495671, -363.9377214), (267.410421226, -364.174392622), (266.557304967, -365.323649821)],
                knots=[2, 2, 2, 2, 3, 3, 3, 3], degree=3))
            add(Edge.make_bspline(
                [(266.557304967, -365.323649821), (266.001832387, -365.28688041), (266.252058122, -365.327222346), (265.051482275, -365.078128088)],
                knots=[3, 3, 3, 3, 4, 4, 4, 4], degree=3))
            add(Edge.make_bspline(
                [(265.051482275, -365.078128088), (264.923261056, -364.826533524), (264.747284285, -364.595969706), (264.52627273, -364.398663812)],
                knots=[4, 4, 4, 4, 5, 5, 5, 5], degree=3))
            add(Edge.make_bspline(
                [(264.52627273, -364.398663812), (264.1268682, -364.035394357), (262.68900377, -362.816385477), (261.436192103, -362.816140934)],
                knots=[5, 5, 5, 5, 6, 6, 6, 6], degree=3))
            add(Edge.make_bspline(
                [(261.436192103, -362.816140934), (260.662749573, -362.831743514), (259.83594122, -363.270833806), (258.872397146, -363.795578641)],
                knots=[6, 6, 6, 6, 7, 7, 7, 7], degree=3))
        make_face()
    extrude(amount=-BASE_FLANGE1_DEPTH)

    # Sketch9 → Tab2 (add)
    with BuildSketch(Plane.XY):
        with Locations((266.794458406, -407.907773393)):
            Rectangle(SKETCH9_W, SKETCH9_H)
    extrude(amount=-TAB2_DEPTH)


solid = part.part
